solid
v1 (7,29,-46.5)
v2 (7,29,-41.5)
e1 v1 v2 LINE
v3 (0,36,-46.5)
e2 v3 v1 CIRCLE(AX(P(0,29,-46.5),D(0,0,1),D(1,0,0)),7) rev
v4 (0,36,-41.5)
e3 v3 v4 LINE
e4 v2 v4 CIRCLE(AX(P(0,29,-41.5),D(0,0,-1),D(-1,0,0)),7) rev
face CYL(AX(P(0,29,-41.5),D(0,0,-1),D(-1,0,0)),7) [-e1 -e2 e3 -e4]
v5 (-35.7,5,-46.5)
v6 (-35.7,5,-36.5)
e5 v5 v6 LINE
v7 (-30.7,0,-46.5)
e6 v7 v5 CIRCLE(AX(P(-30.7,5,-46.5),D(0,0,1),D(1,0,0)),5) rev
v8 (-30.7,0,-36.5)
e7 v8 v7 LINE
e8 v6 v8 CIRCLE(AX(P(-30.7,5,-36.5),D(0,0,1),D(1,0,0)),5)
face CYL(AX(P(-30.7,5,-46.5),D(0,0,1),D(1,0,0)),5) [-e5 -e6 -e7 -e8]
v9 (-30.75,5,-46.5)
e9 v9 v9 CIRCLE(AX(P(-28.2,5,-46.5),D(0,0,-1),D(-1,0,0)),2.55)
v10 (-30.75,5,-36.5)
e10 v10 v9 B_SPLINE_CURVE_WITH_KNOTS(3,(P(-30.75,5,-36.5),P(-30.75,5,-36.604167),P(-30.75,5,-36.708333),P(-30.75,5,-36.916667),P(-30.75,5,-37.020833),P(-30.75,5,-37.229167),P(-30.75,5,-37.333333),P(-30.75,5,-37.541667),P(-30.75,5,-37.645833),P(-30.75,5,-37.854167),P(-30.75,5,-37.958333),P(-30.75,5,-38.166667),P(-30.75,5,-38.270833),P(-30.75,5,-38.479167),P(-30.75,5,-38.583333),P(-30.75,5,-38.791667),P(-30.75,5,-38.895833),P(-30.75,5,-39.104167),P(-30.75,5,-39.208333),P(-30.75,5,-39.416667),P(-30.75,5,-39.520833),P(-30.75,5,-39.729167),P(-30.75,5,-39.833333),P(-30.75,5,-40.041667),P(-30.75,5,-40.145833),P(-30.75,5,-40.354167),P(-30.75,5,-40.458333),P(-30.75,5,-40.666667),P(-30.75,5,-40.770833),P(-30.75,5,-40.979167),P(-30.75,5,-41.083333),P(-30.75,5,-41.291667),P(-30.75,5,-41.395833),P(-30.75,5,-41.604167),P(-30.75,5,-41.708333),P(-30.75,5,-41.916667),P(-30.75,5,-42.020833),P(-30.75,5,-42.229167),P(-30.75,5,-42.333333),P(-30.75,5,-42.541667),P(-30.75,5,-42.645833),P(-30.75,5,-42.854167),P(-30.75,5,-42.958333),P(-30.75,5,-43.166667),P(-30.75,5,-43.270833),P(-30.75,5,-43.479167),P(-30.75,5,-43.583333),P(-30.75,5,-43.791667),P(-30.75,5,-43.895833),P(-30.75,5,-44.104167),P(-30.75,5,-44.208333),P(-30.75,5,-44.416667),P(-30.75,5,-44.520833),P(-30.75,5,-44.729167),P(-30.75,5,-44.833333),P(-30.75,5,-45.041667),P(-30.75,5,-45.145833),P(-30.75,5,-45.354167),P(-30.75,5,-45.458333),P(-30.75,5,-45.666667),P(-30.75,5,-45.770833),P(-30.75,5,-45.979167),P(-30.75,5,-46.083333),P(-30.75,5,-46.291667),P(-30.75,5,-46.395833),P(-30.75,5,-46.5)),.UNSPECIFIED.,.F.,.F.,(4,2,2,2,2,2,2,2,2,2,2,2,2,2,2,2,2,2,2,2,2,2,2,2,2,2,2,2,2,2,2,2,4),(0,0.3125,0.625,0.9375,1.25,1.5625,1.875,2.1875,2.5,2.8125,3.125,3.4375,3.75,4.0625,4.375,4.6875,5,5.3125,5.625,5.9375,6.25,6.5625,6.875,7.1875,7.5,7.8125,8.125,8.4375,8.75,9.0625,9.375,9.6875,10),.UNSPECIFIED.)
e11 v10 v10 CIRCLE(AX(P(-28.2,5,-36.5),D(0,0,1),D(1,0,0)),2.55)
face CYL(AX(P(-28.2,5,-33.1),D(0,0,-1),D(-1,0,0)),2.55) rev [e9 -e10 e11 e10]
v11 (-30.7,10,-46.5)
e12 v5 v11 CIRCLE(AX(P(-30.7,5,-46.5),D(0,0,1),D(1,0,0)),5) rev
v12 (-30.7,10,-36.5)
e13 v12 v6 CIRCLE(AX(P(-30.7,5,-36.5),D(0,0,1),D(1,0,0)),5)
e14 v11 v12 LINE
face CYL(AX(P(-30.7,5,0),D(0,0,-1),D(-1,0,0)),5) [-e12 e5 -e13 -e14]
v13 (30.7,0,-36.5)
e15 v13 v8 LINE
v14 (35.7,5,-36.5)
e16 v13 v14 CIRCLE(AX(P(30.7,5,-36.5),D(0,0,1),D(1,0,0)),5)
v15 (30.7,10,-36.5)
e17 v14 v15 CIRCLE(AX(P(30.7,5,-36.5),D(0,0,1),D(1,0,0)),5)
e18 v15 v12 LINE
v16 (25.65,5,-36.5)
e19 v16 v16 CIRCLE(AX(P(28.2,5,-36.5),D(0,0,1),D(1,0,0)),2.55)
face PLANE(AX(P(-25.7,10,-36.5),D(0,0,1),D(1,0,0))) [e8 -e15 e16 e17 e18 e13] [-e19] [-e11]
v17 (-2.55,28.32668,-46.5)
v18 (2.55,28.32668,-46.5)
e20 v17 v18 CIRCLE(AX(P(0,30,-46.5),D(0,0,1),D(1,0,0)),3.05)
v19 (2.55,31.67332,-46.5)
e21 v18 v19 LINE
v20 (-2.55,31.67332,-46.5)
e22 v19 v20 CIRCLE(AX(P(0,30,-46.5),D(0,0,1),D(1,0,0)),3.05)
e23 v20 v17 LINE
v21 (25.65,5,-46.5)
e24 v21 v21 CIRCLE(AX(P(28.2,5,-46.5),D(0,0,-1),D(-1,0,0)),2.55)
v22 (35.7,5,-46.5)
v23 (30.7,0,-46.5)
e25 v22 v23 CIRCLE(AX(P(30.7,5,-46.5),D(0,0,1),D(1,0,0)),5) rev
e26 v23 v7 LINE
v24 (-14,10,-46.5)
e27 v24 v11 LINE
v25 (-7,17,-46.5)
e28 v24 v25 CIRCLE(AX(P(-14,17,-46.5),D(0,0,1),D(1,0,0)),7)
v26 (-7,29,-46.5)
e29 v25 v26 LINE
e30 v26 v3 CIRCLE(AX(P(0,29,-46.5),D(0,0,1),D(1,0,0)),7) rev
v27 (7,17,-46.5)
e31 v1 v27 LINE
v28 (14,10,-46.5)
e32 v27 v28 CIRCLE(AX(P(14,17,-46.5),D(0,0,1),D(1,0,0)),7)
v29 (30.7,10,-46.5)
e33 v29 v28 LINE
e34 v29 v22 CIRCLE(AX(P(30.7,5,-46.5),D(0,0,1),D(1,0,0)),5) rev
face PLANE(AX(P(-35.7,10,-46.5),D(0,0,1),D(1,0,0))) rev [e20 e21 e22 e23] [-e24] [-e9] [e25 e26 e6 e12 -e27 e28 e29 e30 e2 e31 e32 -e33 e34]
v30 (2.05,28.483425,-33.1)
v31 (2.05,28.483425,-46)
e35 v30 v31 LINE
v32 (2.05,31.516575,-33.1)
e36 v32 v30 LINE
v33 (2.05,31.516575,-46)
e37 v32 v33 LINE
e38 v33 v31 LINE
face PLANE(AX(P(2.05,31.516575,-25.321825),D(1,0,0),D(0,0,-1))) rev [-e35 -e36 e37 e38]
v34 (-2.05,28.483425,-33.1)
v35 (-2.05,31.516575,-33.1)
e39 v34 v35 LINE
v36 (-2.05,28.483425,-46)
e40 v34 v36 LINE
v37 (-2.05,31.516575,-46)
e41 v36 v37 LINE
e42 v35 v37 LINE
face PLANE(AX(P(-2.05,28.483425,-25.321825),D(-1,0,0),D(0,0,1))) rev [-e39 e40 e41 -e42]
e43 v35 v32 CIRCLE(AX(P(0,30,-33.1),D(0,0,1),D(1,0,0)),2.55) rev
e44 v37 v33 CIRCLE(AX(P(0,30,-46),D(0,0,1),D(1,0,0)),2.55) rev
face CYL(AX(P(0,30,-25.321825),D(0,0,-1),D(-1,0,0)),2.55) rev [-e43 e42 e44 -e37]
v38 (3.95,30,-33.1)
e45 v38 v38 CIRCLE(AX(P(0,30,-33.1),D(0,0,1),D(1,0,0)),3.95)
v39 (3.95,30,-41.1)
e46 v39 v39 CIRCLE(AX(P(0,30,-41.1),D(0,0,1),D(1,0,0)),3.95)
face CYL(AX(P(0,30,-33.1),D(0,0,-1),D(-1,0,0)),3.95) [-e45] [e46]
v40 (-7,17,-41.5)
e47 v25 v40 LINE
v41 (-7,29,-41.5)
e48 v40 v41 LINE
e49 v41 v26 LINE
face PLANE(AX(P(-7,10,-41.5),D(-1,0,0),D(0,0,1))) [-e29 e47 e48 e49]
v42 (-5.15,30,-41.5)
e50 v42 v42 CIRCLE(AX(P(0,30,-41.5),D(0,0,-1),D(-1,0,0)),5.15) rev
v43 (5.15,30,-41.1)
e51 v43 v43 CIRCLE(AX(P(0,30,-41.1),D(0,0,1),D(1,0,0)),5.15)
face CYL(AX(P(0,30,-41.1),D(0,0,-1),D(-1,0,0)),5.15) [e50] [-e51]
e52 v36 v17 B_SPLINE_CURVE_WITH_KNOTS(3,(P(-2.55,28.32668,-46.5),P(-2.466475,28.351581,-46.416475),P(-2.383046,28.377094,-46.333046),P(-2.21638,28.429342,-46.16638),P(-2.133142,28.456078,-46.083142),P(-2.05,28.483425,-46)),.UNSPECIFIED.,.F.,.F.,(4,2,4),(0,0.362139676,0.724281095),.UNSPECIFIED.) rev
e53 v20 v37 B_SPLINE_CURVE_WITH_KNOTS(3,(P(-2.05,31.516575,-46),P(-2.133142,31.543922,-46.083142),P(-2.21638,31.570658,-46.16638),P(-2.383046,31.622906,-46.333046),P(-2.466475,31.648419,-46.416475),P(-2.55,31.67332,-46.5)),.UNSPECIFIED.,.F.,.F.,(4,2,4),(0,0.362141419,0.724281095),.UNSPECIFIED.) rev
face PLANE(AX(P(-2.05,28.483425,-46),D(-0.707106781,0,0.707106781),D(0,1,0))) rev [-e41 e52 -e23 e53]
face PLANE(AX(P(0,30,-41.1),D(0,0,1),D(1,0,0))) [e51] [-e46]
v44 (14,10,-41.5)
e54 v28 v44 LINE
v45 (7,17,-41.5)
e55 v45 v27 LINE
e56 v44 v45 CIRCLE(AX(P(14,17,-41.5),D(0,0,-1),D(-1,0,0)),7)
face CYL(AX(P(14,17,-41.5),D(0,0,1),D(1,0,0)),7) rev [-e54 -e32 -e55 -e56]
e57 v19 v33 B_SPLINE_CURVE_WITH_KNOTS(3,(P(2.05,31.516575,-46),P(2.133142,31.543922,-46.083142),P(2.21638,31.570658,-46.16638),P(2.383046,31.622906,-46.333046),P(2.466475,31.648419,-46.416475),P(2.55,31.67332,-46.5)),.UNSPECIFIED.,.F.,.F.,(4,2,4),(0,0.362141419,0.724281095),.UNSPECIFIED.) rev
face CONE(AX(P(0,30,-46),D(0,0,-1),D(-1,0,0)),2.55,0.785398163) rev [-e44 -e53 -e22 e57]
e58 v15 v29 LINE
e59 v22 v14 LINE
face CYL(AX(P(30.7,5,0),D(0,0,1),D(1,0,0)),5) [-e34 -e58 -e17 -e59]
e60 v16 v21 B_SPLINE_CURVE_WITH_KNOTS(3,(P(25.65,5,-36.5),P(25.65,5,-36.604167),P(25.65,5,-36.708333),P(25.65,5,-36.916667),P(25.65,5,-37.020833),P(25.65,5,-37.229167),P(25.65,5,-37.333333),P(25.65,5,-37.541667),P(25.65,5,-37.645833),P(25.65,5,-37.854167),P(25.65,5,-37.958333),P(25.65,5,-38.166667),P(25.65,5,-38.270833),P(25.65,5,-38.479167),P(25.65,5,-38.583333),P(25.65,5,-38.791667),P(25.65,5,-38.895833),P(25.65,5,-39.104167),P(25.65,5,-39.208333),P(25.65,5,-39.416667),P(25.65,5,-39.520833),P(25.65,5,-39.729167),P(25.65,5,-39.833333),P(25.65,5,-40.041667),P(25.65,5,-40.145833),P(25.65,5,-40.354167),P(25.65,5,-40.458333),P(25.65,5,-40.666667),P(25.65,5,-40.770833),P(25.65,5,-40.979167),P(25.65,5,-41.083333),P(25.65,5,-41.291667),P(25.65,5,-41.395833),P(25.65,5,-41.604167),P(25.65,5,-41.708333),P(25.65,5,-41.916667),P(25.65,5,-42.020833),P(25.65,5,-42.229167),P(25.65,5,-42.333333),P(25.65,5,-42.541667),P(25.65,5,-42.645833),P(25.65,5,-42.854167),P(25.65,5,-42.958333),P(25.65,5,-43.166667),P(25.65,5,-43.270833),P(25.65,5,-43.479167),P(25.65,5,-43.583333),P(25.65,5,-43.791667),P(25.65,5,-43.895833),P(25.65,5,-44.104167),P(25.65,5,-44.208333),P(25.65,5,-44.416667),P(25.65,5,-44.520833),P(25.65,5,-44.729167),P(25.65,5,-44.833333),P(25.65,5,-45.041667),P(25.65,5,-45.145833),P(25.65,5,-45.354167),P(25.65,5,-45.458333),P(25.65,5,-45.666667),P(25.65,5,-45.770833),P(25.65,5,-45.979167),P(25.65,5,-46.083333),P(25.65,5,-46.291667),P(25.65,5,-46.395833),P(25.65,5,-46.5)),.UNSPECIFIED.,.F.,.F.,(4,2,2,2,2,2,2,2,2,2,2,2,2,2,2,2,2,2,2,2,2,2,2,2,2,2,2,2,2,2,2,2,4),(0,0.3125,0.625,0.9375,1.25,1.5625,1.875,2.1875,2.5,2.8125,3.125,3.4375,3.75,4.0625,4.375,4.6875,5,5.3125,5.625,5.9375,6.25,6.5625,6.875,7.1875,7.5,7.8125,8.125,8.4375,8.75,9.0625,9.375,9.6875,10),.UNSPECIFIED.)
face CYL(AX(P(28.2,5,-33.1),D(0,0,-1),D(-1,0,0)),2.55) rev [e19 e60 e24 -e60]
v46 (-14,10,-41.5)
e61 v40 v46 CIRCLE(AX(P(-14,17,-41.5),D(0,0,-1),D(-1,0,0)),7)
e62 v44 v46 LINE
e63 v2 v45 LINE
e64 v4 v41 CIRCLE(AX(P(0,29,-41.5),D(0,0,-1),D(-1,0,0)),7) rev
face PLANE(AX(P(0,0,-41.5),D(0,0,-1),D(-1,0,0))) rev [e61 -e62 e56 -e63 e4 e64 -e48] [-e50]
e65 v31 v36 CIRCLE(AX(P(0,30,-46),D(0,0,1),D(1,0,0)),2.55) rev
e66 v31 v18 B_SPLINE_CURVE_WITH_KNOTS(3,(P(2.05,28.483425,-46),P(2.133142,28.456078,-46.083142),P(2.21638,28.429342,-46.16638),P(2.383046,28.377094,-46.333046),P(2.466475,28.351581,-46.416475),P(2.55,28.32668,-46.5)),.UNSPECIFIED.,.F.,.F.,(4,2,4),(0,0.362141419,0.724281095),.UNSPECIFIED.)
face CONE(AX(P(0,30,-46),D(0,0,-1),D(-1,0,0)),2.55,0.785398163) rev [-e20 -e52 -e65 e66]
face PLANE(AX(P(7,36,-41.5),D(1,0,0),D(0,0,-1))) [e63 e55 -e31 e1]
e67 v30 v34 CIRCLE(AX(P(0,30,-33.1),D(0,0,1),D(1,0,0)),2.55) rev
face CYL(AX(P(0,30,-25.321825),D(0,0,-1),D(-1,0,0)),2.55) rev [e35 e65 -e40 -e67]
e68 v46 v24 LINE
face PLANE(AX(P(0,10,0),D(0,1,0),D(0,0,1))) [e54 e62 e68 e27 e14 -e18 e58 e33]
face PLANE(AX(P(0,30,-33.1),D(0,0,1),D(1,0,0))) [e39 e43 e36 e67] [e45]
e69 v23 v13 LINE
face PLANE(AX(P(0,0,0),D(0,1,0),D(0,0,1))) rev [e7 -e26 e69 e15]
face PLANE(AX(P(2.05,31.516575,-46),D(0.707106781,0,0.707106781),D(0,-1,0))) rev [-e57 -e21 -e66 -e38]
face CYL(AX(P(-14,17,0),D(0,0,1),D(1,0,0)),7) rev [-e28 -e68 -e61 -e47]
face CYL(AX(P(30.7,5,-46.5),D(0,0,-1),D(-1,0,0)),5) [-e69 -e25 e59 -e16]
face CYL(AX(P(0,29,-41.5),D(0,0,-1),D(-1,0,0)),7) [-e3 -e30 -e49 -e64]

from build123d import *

# Parameters (mm, degrees)
SKETCH2_W           = 71.4
SKETCH2_H           = 93
SKETCH2_W_2         = 51.4
SKETCH2_H_2         = 73
BOSS_EXTRUDE1_DEPTH = 10
SKETCH3_W           = 14
SKETCH3_H           = 26
SKETCH3_R           = 2.75
BOSS_EXTRUDE2_DEPTH = 5
SKETCH4_R           = 3.95
SKETCH4_R_2         = 2.75
BOSS_EXTRUDE3_DEPTH = 8.4
SKETCH5_W           = 51.4
SKETCH5_H           = 10
CUT_EXTRUDE1_DEPTH  = 65.130647899
SKETCH6_R           = 5.15
SKETCH6_R_2         = 3.95
BOSS_EXTRUDE4_DEPTH = 0.4
SKETCH7_W           = 71.4
SKETCH7_H           = 25
CUT_EXTRUDE2_DEPTH  = 65.130647899
FILLET1_START       = -46.5
FILLET1_DEPTH       = 5
FILLET1_2_DEPTH     = 5
SKETCH10_W          = 71.4
SKETCH10_H          = 58
CUT_EXTRUDE3_DEPTH  = 65.130647899
SKETCH9_R           = 2.55
CUT_EXTRUDE4_DEPTH  = 53.440919138
FILLET2_R           = 5
SKETCH11_R          = 2.75
BOSS_EXTRUDE5_DEPTH = 13.4
CHAMFER1_SIZE       = 0.5


with BuildPart() as part:
    # Sketch2 → Boss-Extrude1 (new body)
    with BuildSketch(Plane(origin=(0, 0, 0), x_dir=(1, 0, 0), z_dir=(0, 1, 0))):
        Rectangle(SKETCH2_W, SKETCH2_H)
        Rectangle(SKETCH2_W_2, SKETCH2_H_2, mode=Mode.SUBTRACT)
    extrude(amount=BOSS_EXTRUDE1_DEPTH)

    # Sketch3 → Boss-Extrude2 (add)
    with BuildSketch(Plane(origin=(0, 0, -46.5), x_dir=(-1, 0, 0), z_dir=(0, 0, -1))):
        with Locations((0, 23)):
            Rectangle(SKETCH3_W, SKETCH3_H)
        with Locations((0, 30)):
            Circle(SKETCH3_R, mode=Mode.SUBTRACT)
    extrude(amount=-BOSS_EXTRUDE2_DEPTH)

    # Sketch4 → Boss-Extrude3 (add)
    with BuildSketch(Plane.XY.offset(-41.5)):
        with Locations(Location((0, 30, 0), (0, 0, 180))):
            Circle(SKETCH4_R)
        with Locations(Location((0, 30, 0), (0, 0, 180))):
            Circle(SKETCH4_R_2, mode=Mode.SUBTRACT)
    extrude(amount=BOSS_EXTRUDE3_DEPTH)

    # Sketch5 → Cut-Extrude1 (cut, through all)
    with BuildSketch(Plane(origin=(0, 10, 0), x_dir=(1, 0, 0), z_dir=(0, 1, 0))):
        with Locations((0, -41.5)):
            Rectangle(SKETCH5_W, SKETCH5_H)
    extrude(amount=-CUT_EXTRUDE1_DEPTH, mode=Mode.SUBTRACT)

    # Sketch6 → Boss-Extrude4 (add)
    with BuildSketch(Plane.XY.offset(-41.5)):
        with Locations(Location((0, 30, 0), (0, 0, 180))):
            Circle(SKETCH6_R)
        with Locations((0, 30)):
            Circle(SKETCH6_R_2, mode=Mode.SUBTRACT)
    extrude(amount=BOSS_EXTRUDE4_DEPTH)

    # Sketch7 → Cut-Extrude2 (cut, through all)
    with BuildSketch(Plane(origin=(0, 10, 0), x_dir=(1, 0, 0), z_dir=(0, 1, 0))):
        with Locations((0, -34)):
            Rectangle(SKETCH7_W, SKETCH7_H)
    extrude(amount=-CUT_EXTRUDE2_DEPTH, mode=Mode.SUBTRACT)

    # Fillet1: read off the stored shape, not the designer's step
    # Fillet1 outline → Fillet1 (cut)
    with BuildSketch(Plane.XY.offset(FILLET1_START)):
        with BuildLine():
            ThreePointArc((0, 36), (4.949747468, 33.949747468), (7, 29))
            Line((7, 29), (7, 36))
            Line((7, 36), (0, 36))
        make_face()
        with BuildLine():
            ThreePointArc((-7, 29), (-4.949747468, 33.949747468), (0, 36))
            Line((0, 36), (-7, 36))
            Line((-7, 36), (-7, 29))
        make_face()
    extrude(amount=FILLET1_DEPTH, mode=Mode.SUBTRACT)

    # Fillet1 2 outline → Fillet1 2 (add)
    with BuildSketch(Plane.XY.offset(FILLET1_START)):
        with BuildLine():
            ThreePointArc((14, 10), (9.050252532, 12.050252532), (7, 17))
            Line((7, 17), (7, 10))
            Line((7, 10), (14, 10))
        make_face()
        with BuildLine():
            Line((-14, 10), (-7, 10))
            Line((-7, 10), (-7, 17))
            ThreePointArc((-7, 17), (-9.050252532, 12.050252532), (-14, 10))
        make_face()
    extrude(amount=FILLET1_2_DEPTH)

    # Sketch10 → Cut-Extrude3 (cut, through all)
    with BuildSketch(Plane(origin=(0, 10, 0), x_dir=(1, 0, 0), z_dir=(0, 1, 0))):
        with Locations((0, 7.5)):
            Rectangle(SKETCH10_W, SKETCH10_H)
    extrude(amount=-CUT_EXTRUDE3_DEPTH, mode=Mode.SUBTRACT)

    # Sketch9 → Cut-Extrude4 (cut, through all)
    with BuildSketch(Plane(origin=(0, 0, -46.5), x_dir=(-1, 0, 0), z_dir=(0, 0, -1))):
        with Locations((-28.2, 5)):
            Circle(SKETCH9_R)
        with Locations((28.2, 5)):
            Circle(SKETCH9_R)
    extrude(amount=-CUT_EXTRUDE4_DEPTH, mode=Mode.SUBTRACT)

    # Fillet2
    fillet2_edges = [part.edges().sort_by_distance(p)[0] for p in [
        (-35.7, 10, -41.5),
        (-35.7, 0, -41.5),
        (35.7, 0, -41.5),
        (35.7, 10, -41.5),
    ]]
    fillet(fillet2_edges, radius=FILLET2_R - 0.0001)  # a hair under: the kernel refuses the full size

    # Sketch11 → Boss-Extrude5 (add)
    with BuildSketch(Plane(origin=(0, 0, -46.5), x_dir=(-1, 0, 0), z_dir=(0, 0, -1))):
        with Locations((0, 30)):
            Circle(SKETCH11_R)
        with BuildLine():
            Line((-2.05, 31.516575089), (-2.05, 28.483424911))
            ThreePointArc((-2.05, 28.483424911), (0, 27.45), (2.05, 28.483424911))
            Line((2.05, 28.483424911), (2.05, 31.516575089))
            ThreePointArc((2.05, 31.516575089), (0, 32.55), (-2.05, 31.516575089))
        make_face(mode=Mode.SUBTRACT)
    extrude(amount=-BOSS_EXTRUDE5_DEPTH)

    # Chamfer1
    chamfer1_edges = [part.edges().sort_by_distance(p)[0] for p in [
        (0, 32.55, -46.5),
        (-2.05, 30, -46.5),
        (0, 27.45, -46.5),
        (2.05, 30, -46.5),
    ]]
    chamfer(chamfer1_edges, length=CHAMFER1_SIZE)


solid = part.part
